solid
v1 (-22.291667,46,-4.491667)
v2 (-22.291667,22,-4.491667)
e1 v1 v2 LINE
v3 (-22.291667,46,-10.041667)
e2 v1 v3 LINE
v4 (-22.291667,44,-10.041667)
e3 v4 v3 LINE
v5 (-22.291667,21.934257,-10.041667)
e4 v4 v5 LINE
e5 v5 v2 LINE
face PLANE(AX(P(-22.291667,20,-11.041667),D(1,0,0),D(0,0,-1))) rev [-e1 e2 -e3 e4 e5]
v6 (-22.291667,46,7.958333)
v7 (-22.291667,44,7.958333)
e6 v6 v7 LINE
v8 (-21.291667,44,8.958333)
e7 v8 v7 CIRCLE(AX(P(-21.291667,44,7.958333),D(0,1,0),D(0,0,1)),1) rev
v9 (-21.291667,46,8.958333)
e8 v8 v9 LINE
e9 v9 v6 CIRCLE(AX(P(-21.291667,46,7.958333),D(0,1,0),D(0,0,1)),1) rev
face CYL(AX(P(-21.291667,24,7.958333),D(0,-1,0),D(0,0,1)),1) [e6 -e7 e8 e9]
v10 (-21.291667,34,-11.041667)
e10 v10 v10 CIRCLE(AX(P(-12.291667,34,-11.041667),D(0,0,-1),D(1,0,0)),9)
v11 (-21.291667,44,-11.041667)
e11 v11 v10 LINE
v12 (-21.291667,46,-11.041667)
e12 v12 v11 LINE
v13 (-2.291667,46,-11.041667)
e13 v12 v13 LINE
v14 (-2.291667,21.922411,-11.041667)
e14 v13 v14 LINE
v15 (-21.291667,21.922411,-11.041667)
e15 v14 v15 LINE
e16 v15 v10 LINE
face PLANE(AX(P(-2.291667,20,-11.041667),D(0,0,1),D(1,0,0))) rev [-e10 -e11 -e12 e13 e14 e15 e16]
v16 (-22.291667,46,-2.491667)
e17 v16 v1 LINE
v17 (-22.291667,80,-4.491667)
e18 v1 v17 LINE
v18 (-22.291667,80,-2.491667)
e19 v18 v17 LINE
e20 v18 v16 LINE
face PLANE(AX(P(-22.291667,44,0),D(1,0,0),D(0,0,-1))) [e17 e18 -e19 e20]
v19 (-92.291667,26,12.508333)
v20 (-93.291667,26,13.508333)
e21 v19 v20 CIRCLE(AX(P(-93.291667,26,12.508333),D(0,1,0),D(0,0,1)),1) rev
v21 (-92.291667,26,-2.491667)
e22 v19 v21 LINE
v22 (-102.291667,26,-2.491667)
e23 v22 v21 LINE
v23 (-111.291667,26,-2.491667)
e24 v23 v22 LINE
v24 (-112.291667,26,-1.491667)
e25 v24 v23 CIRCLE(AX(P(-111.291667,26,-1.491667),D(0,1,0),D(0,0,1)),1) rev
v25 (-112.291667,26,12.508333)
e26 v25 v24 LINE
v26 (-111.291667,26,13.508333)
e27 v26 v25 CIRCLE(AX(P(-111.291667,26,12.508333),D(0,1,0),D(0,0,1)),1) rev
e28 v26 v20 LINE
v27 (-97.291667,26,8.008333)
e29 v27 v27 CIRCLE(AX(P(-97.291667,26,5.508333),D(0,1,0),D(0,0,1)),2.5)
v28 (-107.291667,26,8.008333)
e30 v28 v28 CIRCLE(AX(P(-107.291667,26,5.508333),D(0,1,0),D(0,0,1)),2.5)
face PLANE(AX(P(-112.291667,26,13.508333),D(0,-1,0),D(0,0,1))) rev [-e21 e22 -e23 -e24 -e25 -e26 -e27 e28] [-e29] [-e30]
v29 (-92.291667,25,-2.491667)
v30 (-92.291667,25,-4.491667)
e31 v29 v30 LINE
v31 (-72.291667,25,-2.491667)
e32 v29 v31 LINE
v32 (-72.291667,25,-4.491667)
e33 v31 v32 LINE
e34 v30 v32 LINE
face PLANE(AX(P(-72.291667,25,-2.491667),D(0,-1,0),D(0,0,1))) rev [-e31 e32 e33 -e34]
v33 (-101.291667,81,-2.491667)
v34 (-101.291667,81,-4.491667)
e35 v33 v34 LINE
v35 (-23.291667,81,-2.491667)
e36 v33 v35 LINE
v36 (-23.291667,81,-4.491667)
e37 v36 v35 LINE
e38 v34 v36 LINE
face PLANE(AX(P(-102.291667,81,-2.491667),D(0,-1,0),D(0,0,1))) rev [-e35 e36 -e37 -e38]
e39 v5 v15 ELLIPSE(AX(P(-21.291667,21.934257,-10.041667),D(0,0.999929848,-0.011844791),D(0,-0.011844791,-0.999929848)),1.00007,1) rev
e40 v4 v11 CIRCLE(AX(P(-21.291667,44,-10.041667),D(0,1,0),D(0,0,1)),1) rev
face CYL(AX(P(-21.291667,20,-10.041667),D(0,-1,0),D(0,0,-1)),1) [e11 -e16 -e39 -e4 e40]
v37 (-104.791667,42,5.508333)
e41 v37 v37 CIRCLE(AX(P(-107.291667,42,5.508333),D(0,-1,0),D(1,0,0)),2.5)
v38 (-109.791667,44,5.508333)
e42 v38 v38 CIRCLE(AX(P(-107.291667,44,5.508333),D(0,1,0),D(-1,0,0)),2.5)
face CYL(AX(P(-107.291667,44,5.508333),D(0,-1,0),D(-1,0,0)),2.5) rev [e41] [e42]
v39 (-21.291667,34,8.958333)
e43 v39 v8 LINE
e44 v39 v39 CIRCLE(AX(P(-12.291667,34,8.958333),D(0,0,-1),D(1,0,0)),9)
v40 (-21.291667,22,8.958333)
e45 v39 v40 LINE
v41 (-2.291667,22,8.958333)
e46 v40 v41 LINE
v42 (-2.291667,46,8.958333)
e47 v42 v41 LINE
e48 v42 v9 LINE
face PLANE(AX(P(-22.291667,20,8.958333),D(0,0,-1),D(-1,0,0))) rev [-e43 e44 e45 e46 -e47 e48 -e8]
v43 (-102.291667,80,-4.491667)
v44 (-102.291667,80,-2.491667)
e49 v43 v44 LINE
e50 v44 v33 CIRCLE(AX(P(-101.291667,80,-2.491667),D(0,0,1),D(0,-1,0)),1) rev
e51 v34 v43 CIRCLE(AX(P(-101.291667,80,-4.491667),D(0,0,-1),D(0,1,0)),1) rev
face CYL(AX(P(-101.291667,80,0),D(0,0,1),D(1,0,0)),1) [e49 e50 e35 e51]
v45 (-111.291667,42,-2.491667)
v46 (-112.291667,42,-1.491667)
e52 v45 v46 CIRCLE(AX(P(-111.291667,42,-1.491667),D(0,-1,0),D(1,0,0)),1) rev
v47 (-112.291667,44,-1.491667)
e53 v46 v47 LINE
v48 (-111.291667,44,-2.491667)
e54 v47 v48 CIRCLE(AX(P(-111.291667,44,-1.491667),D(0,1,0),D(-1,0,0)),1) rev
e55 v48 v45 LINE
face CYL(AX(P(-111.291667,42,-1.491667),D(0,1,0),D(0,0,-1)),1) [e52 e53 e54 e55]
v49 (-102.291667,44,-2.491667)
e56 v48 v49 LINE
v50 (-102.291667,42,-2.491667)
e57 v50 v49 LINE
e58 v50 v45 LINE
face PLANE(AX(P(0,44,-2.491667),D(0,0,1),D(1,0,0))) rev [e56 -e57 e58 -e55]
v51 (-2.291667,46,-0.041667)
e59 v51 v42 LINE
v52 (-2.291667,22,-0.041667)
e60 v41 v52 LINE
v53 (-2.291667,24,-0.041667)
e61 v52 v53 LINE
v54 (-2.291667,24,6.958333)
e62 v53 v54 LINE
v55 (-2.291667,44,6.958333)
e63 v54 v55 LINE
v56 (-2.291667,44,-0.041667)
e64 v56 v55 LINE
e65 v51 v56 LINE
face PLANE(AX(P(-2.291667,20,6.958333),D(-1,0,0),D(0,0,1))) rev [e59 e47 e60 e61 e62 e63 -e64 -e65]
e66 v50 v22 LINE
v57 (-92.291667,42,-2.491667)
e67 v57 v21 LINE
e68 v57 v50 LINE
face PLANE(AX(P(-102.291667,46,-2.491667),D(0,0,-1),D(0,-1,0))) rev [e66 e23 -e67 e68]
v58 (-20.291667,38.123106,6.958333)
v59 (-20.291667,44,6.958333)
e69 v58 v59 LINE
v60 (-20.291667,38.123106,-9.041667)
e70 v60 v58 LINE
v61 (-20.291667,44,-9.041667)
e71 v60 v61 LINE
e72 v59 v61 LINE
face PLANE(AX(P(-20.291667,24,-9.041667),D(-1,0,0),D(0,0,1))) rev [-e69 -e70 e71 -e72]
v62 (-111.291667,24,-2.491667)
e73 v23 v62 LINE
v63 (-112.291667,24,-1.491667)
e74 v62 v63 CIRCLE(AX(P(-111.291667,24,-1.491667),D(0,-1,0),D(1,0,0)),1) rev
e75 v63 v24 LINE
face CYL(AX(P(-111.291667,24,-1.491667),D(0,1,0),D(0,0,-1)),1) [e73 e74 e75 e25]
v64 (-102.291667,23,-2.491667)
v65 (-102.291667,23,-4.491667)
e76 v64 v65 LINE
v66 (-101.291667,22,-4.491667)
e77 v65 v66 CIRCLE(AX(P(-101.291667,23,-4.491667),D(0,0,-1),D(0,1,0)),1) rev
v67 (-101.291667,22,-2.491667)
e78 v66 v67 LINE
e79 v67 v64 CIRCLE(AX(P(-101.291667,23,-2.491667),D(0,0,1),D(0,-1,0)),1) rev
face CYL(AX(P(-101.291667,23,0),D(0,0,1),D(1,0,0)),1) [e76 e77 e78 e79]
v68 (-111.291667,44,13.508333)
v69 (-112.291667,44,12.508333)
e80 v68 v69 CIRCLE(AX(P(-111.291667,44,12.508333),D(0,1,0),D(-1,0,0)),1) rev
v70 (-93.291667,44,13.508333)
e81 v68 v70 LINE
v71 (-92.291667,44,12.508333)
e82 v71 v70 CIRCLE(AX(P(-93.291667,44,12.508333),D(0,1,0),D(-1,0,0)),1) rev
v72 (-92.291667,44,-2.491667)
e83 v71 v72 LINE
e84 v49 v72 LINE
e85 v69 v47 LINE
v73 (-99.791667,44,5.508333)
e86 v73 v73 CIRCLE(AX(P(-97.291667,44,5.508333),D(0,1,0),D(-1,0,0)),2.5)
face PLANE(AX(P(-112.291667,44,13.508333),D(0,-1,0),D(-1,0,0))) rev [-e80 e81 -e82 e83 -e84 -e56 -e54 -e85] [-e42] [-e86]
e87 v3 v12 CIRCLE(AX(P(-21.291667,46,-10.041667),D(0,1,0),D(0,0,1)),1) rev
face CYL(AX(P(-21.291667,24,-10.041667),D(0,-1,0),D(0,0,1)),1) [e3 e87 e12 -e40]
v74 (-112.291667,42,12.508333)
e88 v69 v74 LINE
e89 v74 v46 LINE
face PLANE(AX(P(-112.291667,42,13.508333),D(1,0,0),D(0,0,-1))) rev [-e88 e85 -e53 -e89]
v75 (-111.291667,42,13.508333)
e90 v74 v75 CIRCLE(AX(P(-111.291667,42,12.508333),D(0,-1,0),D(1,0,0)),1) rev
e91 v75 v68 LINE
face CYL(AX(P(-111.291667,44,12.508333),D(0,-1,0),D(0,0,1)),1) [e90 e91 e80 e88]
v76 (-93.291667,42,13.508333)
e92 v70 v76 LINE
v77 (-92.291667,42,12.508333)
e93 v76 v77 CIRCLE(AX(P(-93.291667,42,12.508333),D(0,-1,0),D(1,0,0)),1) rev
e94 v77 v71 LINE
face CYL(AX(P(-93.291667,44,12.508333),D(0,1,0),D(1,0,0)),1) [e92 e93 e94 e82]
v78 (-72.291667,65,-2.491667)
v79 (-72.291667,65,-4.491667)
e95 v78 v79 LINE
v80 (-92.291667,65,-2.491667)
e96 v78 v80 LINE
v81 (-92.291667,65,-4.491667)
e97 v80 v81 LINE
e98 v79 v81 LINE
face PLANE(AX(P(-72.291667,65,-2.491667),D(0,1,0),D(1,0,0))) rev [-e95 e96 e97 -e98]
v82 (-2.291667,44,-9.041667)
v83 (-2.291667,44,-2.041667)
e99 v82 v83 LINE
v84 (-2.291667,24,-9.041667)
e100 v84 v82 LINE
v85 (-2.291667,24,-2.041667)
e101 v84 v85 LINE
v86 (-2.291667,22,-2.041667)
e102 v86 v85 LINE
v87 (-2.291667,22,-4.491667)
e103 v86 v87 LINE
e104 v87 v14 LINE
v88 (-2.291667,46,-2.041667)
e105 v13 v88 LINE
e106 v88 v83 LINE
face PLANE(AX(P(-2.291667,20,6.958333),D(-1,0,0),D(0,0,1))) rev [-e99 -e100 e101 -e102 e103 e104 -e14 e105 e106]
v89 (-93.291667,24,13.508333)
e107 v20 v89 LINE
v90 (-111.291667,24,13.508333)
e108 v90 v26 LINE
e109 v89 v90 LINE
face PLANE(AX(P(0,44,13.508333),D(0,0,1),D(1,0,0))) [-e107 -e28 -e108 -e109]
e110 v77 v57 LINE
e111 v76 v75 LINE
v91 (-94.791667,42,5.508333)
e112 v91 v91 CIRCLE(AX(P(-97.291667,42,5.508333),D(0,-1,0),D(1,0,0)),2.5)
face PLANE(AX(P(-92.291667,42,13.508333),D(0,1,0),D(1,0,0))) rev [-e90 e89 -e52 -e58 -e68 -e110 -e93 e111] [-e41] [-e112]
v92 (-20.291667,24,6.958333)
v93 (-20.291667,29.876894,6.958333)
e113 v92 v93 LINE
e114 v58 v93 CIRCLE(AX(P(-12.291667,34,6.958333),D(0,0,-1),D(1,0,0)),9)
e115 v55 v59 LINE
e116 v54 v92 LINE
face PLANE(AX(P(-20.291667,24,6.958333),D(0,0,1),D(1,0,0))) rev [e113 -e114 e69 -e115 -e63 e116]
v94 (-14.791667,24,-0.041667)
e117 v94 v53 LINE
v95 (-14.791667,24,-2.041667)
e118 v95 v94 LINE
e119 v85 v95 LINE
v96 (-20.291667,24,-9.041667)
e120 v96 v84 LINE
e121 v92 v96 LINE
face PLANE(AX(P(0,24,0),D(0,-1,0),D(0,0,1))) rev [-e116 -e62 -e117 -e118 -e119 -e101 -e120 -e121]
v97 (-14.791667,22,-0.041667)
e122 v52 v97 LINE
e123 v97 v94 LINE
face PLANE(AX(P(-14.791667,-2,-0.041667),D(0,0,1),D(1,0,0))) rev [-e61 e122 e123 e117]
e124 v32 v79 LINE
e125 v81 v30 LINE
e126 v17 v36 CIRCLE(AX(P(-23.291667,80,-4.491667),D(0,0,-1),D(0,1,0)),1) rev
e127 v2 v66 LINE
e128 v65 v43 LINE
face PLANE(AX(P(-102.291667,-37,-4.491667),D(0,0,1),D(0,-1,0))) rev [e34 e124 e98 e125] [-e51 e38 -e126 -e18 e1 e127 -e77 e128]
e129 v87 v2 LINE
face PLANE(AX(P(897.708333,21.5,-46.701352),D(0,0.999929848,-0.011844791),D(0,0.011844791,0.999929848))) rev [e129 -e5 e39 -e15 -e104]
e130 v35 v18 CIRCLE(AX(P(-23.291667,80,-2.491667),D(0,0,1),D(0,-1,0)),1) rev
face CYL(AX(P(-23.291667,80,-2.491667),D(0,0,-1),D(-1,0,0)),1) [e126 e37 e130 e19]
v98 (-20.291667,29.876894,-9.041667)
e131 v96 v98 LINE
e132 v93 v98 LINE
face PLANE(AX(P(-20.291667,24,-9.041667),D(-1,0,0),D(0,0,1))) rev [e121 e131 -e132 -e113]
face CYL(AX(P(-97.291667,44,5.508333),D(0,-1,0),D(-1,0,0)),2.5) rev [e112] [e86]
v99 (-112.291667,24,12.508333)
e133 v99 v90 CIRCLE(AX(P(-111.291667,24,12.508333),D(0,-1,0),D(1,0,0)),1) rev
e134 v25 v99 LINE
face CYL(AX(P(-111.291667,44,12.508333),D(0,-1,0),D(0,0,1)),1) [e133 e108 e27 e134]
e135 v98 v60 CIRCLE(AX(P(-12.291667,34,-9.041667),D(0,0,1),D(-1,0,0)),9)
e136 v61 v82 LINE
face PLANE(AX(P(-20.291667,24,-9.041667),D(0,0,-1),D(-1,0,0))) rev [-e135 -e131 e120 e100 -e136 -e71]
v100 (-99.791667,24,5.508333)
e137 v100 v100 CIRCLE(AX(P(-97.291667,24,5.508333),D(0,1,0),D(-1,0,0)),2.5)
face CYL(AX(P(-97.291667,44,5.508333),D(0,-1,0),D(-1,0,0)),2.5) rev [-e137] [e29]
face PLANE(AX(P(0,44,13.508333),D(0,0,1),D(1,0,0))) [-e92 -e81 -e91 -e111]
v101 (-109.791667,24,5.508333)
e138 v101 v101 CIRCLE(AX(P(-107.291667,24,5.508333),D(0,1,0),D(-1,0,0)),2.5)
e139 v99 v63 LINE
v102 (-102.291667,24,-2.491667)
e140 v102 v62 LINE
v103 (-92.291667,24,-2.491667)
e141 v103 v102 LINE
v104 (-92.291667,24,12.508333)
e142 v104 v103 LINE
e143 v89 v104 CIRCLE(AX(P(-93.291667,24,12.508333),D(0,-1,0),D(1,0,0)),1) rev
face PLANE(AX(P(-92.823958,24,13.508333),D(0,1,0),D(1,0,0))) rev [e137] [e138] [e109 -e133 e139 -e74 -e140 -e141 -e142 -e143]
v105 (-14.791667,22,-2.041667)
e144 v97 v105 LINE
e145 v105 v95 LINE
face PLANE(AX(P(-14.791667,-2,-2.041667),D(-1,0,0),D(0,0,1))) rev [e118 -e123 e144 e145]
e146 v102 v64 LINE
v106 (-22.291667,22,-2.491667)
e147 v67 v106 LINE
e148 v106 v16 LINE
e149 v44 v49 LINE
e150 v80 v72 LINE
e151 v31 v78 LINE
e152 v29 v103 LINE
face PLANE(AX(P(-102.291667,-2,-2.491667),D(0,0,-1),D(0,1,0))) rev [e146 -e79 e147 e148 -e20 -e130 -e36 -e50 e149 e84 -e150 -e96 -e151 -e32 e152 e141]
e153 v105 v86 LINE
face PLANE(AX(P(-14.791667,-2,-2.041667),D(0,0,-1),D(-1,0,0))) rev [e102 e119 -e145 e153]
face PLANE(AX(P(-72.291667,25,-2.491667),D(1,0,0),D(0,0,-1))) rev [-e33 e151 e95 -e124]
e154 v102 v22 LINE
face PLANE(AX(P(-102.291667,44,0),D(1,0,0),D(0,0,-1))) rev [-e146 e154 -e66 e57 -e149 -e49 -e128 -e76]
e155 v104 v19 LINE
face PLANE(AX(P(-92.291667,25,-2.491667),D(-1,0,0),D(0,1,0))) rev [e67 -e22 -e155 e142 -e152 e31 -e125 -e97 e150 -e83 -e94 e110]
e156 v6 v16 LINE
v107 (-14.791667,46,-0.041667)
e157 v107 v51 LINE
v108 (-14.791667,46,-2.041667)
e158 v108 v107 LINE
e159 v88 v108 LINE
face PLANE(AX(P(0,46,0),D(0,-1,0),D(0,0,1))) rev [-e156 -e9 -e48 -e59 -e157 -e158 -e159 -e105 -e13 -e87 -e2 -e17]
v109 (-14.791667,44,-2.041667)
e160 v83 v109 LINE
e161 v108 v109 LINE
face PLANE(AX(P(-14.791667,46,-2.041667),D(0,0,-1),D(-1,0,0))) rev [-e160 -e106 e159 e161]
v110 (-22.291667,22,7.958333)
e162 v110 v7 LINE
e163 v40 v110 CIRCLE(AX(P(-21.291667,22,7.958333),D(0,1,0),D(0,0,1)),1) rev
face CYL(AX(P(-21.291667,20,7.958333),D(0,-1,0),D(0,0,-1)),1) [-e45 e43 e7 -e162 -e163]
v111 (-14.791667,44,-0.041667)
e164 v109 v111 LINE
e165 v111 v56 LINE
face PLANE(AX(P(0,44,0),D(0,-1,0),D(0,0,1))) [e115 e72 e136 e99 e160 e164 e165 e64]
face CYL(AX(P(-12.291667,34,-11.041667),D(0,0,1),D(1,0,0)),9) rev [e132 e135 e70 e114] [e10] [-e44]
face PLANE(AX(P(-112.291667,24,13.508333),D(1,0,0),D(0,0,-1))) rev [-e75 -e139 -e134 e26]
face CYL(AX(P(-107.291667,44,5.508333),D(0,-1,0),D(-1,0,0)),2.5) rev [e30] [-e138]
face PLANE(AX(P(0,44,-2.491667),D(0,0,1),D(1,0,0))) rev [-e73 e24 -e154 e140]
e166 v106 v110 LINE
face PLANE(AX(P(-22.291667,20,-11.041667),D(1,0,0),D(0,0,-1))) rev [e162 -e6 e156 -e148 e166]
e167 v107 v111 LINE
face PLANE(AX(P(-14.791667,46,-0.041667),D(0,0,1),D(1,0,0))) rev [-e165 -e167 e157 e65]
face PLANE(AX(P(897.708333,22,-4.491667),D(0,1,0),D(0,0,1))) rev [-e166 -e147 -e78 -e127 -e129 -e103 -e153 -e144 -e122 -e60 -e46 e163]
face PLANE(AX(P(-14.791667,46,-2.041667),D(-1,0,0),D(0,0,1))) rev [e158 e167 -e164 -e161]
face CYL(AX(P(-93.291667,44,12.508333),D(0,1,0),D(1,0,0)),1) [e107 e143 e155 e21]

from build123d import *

# Parameters (mm, degrees)
BOSS_EXTRUDE1_DEPTH = 20
FILLET1_R           = 1
SKETCH2_R           = 9
CUT_EXTRUDE1_DEPTH  = 20
BOSS_EXTRUDE2_START = 2
BOSS_EXTRUDE2_DEPTH = 2
SKETCH4_W           = 20
SKETCH4_H           = 20
BOSS_EXTRUDE3_DEPTH = 2
FILLET2_R           = 1
SKETCH5_W           = 12.5
SKETCH5_H           = 2
CUT_EXTRUDE2_DEPTH  = 24
BOSS_EXTRUDE4_DEPTH = 80
FILLET3_R           = 1
SKETCH8_R           = 7.11392485
SKETCH8_W           = 20
SKETCH8_H           = 40
CUT_EXTRUDE3_DEPTH  = 2
SKETCH9_W           = 20
SKETCH9_H           = 2
BOSS_EXTRUDE5_DEPTH = 16
FILLET4_R           = 1
SKETCH10_R          = 2.5
CUT_EXTRUDE4_DEPTH  = 20
CUT_EXTRUDE5_DEPTH  = 1000
SKETCH16_W          = 44.924413541
SKETCH16_H          = 28.761805837
CUT_EXTRUDE6_DEPTH  = 200


with BuildPart() as part:
    # Sketch1 → Boss-Extrude1 (new body)
    with BuildSketch(Plane(origin=(0, 0, 0), x_dir=(1, 0, 0), z_dir=(0, 1, 0))):
        Polygon((-2.291666667, 11.041666667), (-22.291666667, 11.041666667), (-22.291666667, -8.958333333), (-2.291666667, -8.958333333), (-2.291666667, -6.958333333), (-20.291666667, -6.958333333), (-20.291666667, 9.041666667), (-2.291666667, 9.041666667), align=None)
    extrude(amount=BOSS_EXTRUDE1_DEPTH)

    # Fillet1
    fillet1_edges = [part.edges().sort_by_distance(p)[0] for p in [
        (-22.291666667, 10, 8.958333333),
        (-22.291666667, 10, -11.041666667),
    ]]
    fillet(fillet1_edges, radius=FILLET1_R)

    # Sketch2 → Cut-Extrude1 (cut)
    with BuildSketch(Plane.XY.offset(8.958333333)):
        with Locations(Location((-12.291666667, 10, 0), (0, 0, 180))):
            Circle(SKETCH2_R)
    extrude(amount=-CUT_EXTRUDE1_DEPTH, mode=Mode.SUBTRACT)

    # Sketch3 → Boss-Extrude2 (add)
    with BuildSketch(Plane(origin=(0, 20, 0), x_dir=(1, 0, 0), z_dir=(0, 1, 0)).offset(BOSS_EXTRUDE2_START)):
        Polygon((-2.291666667, 2.377848536), (-2.291666667, 9.041666667), (-20.291666667, 9.041666667), (-20.291666667, -6.958333333), (-2.291666667, -6.958333333), (-2.291666667, 0.377848536), align=None)
        with BuildLine():
            Line((-2.291666667, 9.041666667), (-2.291666667, 11.041666667))
            Line((-2.291666667, 11.041666667), (-21.291666667, 11.041666667))
            ThreePointArc((-21.291666667, 11.041666667), (-21.998773448, 10.748773448), (-22.291666667, 10.041666667))
            Line((-22.291666667, 10.041666667), (-22.291666667, -7.958333333))
            ThreePointArc((-22.291666667, -7.958333333), (-21.998773448, -8.665440115), (-21.291666667, -8.958333333))
            Line((-21.291666667, -8.958333333), (-2.291666667, -8.958333333))
            Line((-2.291666667, -8.958333333), (-2.291666667, -6.958333333))
            Line((-2.291666667, -6.958333333), (-20.291666667, -6.958333333))
            Line((-20.291666667, -6.958333333), (-20.291666667, 9.041666667))
            Line((-20.291666667, 9.041666667), (-2.291666667, 9.041666667))
        make_face()
    extrude(amount=-BOSS_EXTRUDE2_DEPTH)

    # Sketch4 → Boss-Extrude3 (add)
    with BuildSketch(Plane.XZ):
        with Locations((-12.291666667, -1.041666667)):
            Rectangle(SKETCH4_W, SKETCH4_H)
    extrude(amount=BOSS_EXTRUDE3_DEPTH)

    # Fillet2
    fillet2_edges = [part.edges().sort_by_distance(p)[0] for p in [
        (-22.291666667, -1, -11.041666667),
        (-22.291666667, -1, 8.958333333),
    ]]
    fillet(fillet2_edges, radius=FILLET2_R - 0.0001)  # a hair under: the kernel refuses the full size

    # Sketch5 → Cut-Extrude2 (cut)
    with BuildSketch(Plane(origin=(0, 22, 0), x_dir=(1, 0, 0), z_dir=(0, 1, 0))):
        with Locations((-8.541666667, 1.041666667)):
            Rectangle(SKETCH5_W, SKETCH5_H)
    extrude(amount=-CUT_EXTRUDE2_DEPTH, mode=Mode.SUBTRACT)

    # Sketch6 → Boss-Extrude4 (add)
    with BuildSketch(Plane.ZY.offset(22.291666667)):
        Polygon((-2.491666667, -37), (-4.491666667, -37), (-4.491666667, -2), (-4.491666667, 22), (-2.491666667, 22), (-2.491666667, -2), align=None)
    extrude(amount=BOSS_EXTRUDE4_DEPTH)

    # Fillet3
    fillet3_edges = [part.edges().sort_by_distance(p)[0] for p in [
        (-22.291666667, -37, -3.491666667),
        (-102.291666667, 22, -3.491666667),
        (-102.291666667, -37, -3.491666667),
    ]]
    fillet(fillet3_edges, radius=FILLET3_R)

    # Sketch8 → Cut-Extrude3 (cut)
    with BuildSketch(Plane(origin=(0, 0, -4.491666667), x_dir=(-1, 0, 0), z_dir=(0, 0, -1))):
        with Locations((12.291666667, 10)):
            Circle(SKETCH8_R)
        with Locations((82.291666667, -1)):
            Rectangle(SKETCH8_W, SKETCH8_H)
    extrude(amount=-CUT_EXTRUDE3_DEPTH, mode=Mode.SUBTRACT)

    # Sketch9 → Boss-Extrude5 (add)
    with BuildSketch(Plane.XY.offset(-2.491666667)):
        Polygon((-92.823958121, 20), (-112.291666667, 20), (-112.291666667, 18), (-92.291666667, 18), (-92.291666667, 20), align=None)
        with Locations((-102.291666667, 1)):
            Rectangle(SKETCH9_W, SKETCH9_H)
    extrude(amount=BOSS_EXTRUDE5_DEPTH)

    # Fillet4
    fillet4_edges = [part.edges().sort_by_distance(p)[0] for p in [
        (-112.291666667, 19, -2.491666667),
        (-112.291666667, 19, 13.508333333),
        (-92.291666667, 19, 13.508333333),
        (-112.291666667, 1, -2.491666667),
        (-92.291666667, 1, 13.508333333),
        (-112.291666667, 1, 13.508333333),
    ]]
    fillet(fillet4_edges, radius=FILLET4_R)

    # Sketch10 → Cut-Extrude4 (cut)
    with BuildSketch(Plane(origin=(0, 20, 0), x_dir=(1, 0, 0), z_dir=(0, 1, 0))):
        with Locations(Location((-97.291666667, -5.508333333, 0), (0, 0, 180))):
            Circle(SKETCH10_R)
        with Locations(Location((-107.291666667, -5.508333333, 0), (0, 0, 180))):
            Circle(SKETCH10_R)
    extrude(amount=-CUT_EXTRUDE4_DEPTH, mode=Mode.SUBTRACT)

    # Mirror18: part across plane


with BuildPart() as part_1:
    add(part.part)
    add(part.part.mirror(Plane.ZX.offset(22)))

    # Sketch15 → Cut-Extrude5 (cut)
    with BuildSketch(Plane.ZY.offset(102.291666667)):
        Polygon((-4.491666667, 22), (26.371176894, 22), (26.371176894, -60.225143759), (-46.701352218, -60.225143759), (-46.701352218, 21.5), align=None)
    extrude(amount=-CUT_EXTRUDE5_DEPTH, mode=Mode.SUBTRACT)


with BuildPart() as cut_extrude5_piece_1:
    # of the separate pieces the step leaves, piece 1, a body of its own (cut_extrude5_pieces)
    add(part_1.part.solids().sort_by_distance((-101.291666667, 22, -2.491666667))[0])


with BuildPart() as cut_extrude5_piece_2:
    # of the separate pieces the step leaves, piece 2, a body of its own (cut_extrude5_pieces)
    add(part_1.part.solids().sort_by_distance((-112.291666667, 20, -1.491666667))[0])


with BuildPart() as cut_extrude5_piece_3:
    # of the separate pieces the step leaves, piece 3, a body of its own (cut_extrude5_pieces)
    add(part_1.part.solids().sort_by_distance((-111.291666667, 2, -2.491666667))[0])


with BuildPart() as cut_extrude6_tool:
    # Sketch16 → Cut-Extrude6 (new body)
    with BuildSketch(Plane(origin=(-102.291666667, 0, 0), x_dir=(0, 0, -1), z_dir=(1, 0, 0))):
        with Locations((-5.305801417, 7.602093766)):
            Rectangle(SKETCH16_W, SKETCH16_H)
    extrude(amount=-CUT_EXTRUDE6_DEPTH)


with BuildPart() as cut_extrude5_piece_2_1:
    add(cut_extrude5_piece_2.part)

    # Cut-Extrude6: cut by cut_extrude6_tool
    add(cut_extrude6_tool.part, mode=Mode.SUBTRACT)


with BuildPart() as cut_extrude5_piece_3_1:
    add(cut_extrude5_piece_3.part)

    # Cut-Extrude6: cut by cut_extrude6_tool
    add(cut_extrude6_tool.part, mode=Mode.SUBTRACT)


solid = cut_extrude5_piece_1.part
